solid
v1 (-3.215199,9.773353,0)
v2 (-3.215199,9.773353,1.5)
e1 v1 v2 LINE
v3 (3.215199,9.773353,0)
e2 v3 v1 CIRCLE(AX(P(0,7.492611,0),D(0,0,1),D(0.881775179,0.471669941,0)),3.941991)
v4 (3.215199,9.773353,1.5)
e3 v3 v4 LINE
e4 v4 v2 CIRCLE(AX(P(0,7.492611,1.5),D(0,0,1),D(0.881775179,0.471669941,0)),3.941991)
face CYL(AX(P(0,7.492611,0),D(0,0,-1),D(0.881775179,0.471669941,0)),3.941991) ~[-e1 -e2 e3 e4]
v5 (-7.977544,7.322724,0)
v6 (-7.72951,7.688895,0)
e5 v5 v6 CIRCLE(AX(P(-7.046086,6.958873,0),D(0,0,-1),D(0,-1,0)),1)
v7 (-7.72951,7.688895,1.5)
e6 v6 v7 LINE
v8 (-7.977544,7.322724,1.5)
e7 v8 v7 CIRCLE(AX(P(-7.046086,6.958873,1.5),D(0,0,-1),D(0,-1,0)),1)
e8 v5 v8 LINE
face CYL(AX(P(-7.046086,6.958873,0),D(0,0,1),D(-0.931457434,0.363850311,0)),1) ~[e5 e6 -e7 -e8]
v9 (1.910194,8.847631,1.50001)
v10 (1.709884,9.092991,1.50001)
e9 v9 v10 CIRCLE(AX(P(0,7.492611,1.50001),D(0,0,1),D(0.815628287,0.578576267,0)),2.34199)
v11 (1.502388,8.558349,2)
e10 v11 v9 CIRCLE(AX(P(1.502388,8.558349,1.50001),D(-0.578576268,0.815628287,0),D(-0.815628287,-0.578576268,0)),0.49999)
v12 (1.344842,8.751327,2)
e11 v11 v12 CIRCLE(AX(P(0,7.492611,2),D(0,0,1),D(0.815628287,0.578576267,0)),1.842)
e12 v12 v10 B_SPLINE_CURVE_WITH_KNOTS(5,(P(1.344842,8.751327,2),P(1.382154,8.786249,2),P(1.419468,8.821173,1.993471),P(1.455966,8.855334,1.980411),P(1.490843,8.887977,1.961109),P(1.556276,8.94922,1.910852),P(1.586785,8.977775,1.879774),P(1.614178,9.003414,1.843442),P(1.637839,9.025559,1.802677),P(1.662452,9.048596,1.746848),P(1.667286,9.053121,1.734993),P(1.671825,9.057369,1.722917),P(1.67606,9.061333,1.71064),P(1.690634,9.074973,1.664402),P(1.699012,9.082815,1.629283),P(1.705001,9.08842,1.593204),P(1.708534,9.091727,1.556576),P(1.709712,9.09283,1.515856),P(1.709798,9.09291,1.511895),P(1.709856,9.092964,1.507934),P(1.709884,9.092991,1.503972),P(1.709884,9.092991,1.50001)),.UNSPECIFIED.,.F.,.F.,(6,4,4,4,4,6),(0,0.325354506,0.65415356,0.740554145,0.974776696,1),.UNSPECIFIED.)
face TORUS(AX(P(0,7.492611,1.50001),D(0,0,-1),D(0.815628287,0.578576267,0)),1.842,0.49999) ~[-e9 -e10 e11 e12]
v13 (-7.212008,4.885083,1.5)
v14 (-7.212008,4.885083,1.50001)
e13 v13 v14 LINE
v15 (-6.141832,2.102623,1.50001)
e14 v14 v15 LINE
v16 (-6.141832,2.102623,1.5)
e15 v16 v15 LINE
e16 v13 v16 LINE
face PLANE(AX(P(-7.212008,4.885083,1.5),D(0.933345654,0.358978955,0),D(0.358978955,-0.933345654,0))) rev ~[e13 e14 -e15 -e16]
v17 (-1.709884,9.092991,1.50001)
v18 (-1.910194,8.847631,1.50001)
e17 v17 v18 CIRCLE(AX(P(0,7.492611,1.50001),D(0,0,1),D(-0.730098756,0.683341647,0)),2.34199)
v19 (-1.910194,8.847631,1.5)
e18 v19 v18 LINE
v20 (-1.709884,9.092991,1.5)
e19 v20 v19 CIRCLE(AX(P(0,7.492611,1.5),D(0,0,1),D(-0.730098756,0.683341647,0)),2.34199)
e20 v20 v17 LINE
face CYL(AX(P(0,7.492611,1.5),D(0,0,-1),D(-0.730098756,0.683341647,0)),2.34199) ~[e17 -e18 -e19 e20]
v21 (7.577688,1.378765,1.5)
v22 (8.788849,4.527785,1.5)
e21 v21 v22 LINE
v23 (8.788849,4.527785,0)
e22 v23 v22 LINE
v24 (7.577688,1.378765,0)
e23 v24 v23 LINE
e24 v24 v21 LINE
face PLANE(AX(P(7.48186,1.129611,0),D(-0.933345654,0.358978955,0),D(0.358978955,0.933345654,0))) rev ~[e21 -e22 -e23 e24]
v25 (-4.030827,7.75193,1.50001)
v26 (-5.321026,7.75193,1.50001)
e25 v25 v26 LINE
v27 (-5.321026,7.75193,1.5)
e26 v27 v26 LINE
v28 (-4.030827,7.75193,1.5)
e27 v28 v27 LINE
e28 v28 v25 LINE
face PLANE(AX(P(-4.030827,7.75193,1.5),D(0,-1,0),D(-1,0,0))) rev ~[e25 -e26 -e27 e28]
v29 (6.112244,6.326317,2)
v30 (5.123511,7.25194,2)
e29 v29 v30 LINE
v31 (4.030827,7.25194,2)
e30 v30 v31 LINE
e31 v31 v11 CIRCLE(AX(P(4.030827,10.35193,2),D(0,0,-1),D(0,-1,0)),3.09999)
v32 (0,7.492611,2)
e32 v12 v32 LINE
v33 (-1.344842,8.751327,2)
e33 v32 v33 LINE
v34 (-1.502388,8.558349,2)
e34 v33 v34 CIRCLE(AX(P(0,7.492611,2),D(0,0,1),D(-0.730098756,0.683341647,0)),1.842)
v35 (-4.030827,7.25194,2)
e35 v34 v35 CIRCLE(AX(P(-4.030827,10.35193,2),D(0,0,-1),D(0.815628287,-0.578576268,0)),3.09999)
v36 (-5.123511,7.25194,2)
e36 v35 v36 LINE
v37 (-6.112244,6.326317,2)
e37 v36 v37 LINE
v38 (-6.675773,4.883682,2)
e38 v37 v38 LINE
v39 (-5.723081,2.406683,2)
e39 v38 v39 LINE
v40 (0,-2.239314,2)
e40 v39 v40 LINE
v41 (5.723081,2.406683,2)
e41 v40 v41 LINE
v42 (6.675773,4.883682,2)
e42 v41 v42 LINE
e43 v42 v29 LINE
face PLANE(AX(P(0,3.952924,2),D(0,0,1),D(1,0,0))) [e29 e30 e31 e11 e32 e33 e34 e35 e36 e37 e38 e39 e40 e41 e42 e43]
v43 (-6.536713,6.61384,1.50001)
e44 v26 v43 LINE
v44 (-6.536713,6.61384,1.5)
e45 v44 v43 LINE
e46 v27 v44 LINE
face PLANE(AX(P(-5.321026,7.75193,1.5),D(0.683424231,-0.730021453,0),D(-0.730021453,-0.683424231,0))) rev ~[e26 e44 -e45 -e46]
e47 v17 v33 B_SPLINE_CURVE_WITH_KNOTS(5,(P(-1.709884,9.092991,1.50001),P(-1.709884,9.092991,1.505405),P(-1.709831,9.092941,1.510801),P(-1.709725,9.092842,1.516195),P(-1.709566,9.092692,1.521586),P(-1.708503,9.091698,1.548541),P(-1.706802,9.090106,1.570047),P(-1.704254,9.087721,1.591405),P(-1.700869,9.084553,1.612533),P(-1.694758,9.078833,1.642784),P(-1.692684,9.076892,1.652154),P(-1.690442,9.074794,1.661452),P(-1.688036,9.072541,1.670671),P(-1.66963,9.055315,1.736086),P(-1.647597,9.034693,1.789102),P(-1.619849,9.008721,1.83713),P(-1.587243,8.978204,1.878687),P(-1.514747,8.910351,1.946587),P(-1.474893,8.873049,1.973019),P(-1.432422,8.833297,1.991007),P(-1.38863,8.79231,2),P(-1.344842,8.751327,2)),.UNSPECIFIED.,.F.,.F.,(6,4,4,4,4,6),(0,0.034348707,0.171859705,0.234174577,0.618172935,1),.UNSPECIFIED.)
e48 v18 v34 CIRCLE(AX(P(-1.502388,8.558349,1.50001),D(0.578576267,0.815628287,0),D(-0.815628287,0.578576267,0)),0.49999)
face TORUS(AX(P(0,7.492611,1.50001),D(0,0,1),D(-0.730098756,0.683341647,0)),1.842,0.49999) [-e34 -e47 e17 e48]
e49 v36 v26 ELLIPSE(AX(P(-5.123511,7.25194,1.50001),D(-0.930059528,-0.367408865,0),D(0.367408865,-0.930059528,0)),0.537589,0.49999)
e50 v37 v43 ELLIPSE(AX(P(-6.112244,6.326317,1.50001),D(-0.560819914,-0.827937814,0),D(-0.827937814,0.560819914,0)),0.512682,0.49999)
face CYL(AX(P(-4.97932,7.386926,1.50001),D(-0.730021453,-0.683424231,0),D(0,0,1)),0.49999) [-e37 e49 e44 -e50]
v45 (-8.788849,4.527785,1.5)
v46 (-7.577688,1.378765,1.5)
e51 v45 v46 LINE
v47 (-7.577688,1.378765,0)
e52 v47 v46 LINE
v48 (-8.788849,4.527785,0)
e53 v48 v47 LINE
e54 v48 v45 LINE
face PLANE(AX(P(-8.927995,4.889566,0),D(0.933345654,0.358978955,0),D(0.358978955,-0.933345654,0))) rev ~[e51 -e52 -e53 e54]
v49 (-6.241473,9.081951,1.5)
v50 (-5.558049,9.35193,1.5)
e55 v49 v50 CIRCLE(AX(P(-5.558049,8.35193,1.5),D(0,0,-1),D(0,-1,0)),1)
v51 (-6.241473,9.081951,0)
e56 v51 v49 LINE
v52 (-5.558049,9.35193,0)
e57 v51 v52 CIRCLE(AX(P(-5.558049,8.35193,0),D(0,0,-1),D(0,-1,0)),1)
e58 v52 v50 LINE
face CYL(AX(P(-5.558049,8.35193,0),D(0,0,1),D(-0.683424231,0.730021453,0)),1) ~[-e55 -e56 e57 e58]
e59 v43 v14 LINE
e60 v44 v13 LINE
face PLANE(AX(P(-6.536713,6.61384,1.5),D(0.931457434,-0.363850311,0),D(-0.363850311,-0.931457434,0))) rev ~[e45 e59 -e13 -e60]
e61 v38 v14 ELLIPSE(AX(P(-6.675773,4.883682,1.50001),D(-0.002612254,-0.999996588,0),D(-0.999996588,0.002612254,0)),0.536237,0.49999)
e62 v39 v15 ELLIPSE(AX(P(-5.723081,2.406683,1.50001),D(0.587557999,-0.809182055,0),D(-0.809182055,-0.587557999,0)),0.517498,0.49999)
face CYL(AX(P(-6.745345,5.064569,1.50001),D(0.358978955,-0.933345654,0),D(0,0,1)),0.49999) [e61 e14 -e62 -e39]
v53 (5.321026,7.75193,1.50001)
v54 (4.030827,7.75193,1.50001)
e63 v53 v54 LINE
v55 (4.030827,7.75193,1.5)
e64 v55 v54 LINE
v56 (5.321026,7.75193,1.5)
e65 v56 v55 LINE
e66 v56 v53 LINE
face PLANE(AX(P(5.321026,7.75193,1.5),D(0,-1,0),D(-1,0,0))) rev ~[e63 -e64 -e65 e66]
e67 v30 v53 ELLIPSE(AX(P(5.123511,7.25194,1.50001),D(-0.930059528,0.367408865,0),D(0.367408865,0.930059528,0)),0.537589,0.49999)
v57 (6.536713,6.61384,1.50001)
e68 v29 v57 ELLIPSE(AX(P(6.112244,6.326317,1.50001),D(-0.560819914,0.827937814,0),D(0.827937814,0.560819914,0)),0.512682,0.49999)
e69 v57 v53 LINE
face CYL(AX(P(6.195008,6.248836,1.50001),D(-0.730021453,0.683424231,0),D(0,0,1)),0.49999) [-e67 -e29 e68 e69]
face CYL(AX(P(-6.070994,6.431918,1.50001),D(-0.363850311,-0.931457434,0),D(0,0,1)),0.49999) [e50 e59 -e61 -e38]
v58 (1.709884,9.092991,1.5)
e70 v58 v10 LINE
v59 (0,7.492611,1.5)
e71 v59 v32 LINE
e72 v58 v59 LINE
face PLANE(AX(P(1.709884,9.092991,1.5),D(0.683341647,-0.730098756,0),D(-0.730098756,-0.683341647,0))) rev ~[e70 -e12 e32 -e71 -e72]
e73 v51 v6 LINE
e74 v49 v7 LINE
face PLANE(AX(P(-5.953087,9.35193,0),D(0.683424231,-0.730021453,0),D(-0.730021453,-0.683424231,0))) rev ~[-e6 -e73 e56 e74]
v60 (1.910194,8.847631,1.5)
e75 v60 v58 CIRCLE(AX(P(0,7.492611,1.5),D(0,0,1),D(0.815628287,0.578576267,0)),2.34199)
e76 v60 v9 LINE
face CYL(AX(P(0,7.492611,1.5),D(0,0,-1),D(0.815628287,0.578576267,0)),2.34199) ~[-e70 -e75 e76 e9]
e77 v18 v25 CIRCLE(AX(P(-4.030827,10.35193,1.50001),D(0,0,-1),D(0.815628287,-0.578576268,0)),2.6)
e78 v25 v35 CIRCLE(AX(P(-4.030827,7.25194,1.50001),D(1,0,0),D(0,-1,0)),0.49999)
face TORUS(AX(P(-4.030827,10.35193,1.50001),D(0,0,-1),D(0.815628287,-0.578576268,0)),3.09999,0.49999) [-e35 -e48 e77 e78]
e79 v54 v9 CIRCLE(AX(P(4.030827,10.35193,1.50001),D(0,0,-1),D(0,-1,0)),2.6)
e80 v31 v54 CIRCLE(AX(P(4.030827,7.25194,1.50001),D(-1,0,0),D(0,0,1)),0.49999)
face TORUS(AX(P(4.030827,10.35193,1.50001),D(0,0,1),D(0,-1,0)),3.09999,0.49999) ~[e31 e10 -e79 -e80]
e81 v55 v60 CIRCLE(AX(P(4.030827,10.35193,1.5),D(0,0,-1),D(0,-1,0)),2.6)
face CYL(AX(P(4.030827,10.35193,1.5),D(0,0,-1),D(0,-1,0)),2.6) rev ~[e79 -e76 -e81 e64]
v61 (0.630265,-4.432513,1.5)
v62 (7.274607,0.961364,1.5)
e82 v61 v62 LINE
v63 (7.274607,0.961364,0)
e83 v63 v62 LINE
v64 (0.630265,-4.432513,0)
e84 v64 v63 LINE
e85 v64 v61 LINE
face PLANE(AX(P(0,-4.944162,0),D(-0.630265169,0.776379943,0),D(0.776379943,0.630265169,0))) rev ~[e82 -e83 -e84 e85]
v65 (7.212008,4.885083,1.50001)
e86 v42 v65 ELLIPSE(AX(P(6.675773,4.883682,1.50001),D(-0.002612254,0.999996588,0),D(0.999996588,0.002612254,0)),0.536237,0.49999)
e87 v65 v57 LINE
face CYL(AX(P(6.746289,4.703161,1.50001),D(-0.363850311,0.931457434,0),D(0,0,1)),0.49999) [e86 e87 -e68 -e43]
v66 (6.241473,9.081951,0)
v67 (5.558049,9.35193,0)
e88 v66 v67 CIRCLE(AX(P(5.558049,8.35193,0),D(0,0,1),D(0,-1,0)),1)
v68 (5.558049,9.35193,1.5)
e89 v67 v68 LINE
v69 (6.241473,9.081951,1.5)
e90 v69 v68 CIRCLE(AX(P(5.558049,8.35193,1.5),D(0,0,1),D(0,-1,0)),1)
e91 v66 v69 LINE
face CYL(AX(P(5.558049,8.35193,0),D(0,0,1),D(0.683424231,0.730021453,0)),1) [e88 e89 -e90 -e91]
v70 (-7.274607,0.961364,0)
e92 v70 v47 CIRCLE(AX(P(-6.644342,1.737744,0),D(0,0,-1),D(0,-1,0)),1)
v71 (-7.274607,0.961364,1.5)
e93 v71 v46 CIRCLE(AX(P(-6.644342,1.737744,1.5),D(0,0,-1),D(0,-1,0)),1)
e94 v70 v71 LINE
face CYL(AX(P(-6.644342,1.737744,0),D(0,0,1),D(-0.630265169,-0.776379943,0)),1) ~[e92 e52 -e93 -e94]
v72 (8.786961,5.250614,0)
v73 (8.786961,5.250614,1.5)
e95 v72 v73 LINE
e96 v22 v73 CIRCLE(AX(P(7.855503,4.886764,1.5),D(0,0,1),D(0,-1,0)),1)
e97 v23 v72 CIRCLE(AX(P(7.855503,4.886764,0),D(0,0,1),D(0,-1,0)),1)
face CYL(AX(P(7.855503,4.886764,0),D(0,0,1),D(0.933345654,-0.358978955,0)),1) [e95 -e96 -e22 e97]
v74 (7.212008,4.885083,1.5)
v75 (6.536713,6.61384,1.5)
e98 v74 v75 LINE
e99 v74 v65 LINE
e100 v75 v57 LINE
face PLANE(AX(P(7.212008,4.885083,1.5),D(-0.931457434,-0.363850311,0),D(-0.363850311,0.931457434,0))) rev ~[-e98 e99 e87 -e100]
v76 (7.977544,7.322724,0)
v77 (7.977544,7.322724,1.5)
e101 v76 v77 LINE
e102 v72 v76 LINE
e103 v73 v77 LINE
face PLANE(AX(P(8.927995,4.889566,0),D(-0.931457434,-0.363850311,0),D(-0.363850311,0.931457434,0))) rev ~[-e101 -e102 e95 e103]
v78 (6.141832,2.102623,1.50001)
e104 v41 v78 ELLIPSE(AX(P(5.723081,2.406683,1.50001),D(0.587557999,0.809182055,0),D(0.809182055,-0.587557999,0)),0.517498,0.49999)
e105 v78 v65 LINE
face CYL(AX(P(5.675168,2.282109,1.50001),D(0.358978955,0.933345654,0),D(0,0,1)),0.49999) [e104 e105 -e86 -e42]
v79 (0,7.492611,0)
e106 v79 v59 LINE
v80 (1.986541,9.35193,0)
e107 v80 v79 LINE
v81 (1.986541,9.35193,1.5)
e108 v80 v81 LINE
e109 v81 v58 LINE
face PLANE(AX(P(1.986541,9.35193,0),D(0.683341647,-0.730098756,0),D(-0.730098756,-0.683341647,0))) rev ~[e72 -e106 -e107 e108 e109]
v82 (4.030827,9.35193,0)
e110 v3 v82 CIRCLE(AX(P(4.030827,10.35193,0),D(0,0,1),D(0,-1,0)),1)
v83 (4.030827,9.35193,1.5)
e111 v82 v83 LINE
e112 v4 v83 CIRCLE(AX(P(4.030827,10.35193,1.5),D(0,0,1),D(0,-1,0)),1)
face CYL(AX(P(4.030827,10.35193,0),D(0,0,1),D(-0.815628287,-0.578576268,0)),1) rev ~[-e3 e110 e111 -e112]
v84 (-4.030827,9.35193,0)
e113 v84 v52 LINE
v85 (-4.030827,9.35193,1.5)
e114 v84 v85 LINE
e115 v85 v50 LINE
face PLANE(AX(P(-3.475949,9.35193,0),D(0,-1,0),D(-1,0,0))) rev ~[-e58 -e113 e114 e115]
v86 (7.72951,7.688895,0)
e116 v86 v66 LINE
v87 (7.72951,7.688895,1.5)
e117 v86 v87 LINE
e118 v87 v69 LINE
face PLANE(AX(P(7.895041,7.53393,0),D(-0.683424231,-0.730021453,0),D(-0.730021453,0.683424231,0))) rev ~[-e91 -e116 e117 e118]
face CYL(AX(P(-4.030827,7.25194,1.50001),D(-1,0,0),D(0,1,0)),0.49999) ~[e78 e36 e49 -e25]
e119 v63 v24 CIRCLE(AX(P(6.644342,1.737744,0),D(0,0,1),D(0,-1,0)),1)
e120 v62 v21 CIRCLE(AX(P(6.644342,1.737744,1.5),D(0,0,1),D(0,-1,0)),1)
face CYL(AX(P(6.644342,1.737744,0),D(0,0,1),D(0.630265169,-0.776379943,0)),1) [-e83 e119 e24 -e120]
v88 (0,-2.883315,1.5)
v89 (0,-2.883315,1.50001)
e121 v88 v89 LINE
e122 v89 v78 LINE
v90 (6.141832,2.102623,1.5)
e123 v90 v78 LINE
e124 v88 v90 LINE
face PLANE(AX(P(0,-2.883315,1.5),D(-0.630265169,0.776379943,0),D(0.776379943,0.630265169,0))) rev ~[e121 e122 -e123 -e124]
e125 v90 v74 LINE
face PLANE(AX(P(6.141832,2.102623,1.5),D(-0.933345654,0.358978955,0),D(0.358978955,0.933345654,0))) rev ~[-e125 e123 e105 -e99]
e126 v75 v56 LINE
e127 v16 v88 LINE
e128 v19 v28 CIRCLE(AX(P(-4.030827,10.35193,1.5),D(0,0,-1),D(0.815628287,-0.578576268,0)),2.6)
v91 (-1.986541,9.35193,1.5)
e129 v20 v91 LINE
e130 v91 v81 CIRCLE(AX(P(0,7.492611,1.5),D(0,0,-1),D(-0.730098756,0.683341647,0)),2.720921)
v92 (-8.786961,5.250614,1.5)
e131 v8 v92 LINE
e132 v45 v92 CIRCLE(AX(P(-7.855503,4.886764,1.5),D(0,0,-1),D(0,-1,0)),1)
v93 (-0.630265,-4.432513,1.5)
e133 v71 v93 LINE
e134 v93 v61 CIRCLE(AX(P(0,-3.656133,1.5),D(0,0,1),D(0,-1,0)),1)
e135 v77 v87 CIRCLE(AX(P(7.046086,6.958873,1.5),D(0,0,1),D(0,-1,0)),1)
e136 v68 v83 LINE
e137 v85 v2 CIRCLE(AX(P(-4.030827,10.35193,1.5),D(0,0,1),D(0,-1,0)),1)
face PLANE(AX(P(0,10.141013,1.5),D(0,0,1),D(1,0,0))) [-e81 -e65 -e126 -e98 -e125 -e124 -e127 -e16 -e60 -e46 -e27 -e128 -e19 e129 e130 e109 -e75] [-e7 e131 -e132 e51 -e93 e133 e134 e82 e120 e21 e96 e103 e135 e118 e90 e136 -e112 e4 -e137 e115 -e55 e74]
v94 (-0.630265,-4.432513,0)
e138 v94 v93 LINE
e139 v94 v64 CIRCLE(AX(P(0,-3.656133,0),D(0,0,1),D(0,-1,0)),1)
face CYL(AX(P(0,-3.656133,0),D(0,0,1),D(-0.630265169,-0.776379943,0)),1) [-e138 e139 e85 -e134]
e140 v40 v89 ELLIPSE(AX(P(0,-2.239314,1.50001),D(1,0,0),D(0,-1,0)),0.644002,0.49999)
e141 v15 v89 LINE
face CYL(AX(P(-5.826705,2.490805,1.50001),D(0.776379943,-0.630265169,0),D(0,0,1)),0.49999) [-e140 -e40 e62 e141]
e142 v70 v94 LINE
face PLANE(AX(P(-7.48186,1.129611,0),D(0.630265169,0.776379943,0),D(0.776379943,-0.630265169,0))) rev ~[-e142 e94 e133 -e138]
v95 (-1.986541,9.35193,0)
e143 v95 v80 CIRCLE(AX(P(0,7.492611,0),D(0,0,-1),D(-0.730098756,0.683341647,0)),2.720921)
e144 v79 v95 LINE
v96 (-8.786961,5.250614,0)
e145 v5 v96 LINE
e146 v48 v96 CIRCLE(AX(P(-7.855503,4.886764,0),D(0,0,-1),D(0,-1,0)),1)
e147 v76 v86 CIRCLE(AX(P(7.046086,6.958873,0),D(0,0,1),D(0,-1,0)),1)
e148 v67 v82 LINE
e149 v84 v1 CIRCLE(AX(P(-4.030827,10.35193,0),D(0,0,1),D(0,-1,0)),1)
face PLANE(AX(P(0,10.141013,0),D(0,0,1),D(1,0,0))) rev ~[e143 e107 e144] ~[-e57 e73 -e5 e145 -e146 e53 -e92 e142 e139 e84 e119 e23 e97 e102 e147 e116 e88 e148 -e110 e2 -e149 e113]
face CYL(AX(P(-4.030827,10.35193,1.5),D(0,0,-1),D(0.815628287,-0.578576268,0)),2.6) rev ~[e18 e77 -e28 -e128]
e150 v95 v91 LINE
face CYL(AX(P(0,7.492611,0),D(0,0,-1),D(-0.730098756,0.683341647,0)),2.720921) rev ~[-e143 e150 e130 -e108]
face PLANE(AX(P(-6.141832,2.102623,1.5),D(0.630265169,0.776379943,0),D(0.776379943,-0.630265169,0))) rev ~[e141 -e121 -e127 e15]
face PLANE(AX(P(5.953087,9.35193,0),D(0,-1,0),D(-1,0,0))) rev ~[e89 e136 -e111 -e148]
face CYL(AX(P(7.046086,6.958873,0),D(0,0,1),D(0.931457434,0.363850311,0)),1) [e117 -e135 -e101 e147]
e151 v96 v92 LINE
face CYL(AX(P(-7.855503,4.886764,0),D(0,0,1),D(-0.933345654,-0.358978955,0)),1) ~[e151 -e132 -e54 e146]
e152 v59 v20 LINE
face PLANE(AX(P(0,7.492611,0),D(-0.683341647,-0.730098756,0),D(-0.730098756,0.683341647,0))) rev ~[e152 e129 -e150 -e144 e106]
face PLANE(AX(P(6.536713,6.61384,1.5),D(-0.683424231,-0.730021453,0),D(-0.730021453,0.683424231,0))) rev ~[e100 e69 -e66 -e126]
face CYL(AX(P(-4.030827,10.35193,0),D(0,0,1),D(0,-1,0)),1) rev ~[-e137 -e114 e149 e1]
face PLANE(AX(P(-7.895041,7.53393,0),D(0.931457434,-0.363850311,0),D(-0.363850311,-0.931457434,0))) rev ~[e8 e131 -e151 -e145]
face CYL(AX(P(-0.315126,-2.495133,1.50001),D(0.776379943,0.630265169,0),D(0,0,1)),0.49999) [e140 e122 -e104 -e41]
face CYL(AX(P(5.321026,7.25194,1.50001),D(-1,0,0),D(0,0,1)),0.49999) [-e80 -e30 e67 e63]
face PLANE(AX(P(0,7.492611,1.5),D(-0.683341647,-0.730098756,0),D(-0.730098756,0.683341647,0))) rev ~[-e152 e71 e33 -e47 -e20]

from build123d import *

# Parameters (mm, degrees)
F1_DEPTH = 1.5
F2_R     = 1
F3_R     = 1
F5_DEPTH = 0.5
F6_R     = 0.49999


# Not quite as in the source:
# - a fillet or chamfer is up to 0.001 mm smaller than in the source, because OpenCascade refuses the exact size


with BuildPart() as f1:
    # F0 (on Top) → F1 (new body)
    with BuildSketch(Plane.XY):
        with BuildLine():
            ThreePointArc((-1.986540854, 9.3519296497), (0, 10.2135319331), (1.986540854, 9.3519296497))
            Line((1.986540854, 9.3519296497), (3.4759494504, 9.3519296497))
            ThreePointArc((3.4759494504, 9.3519296497), (0, 11.4346017651), (-3.4759494504, 9.3519296497))
            Line((-3.4759494504, 9.3519296497), (-1.986540854, 9.3519296497))
        make_face()
        with BuildLine():
            Line((5.9530865401, 9.3519296497), (3.4759494504, 9.3519296497))
            ThreePointArc((3.4759494504, 9.3519296497), (3.8237056455, 8.4510290854), (3.9419905804, 7.4926111847))
            ThreePointArc((3.9419905804, 7.4926111847), (-0.9584179006, 3.6689055392), (-3.4759494504, 9.3519296497))
            Line((-3.4759494504, 9.3519296497), (-5.9530865401, 9.3519296497))
            Line((-5.9530865401, 9.3519296497), (-7.8950412571, 7.5339297764))
            Line((-7.8950412571, 7.5339297764), (-8.927995339, 4.88956552))
            Line((-8.927995339, 4.88956552), (-7.4818595313, 1.1296109296))
            Line((-7.4818595313, 1.1296109296), (0, -4.9441619776))
            Line((0, -4.9441619776), (7.4818595313, 1.1296109296))
            Line((7.4818595313, 1.1296109296), (8.927995339, 4.88956552))
            Line((8.927995339, 4.88956552), (7.8950412571, 7.5339297764))
            Line((7.8950412571, 7.5339297764), (5.9530865401, 9.3519296497))
        make_face()
        with BuildLine():
            Line((3.4759494504, 9.3519296497), (1.986540854, 9.3519296497))
            ThreePointArc((1.986540854, 9.3519296497), (2.5306748058, 8.4921584552), (2.7209207483, 7.4926111847))
            ThreePointArc((2.7209207483, 7.4926111847), (-0.9995472705, 4.9619363789), (-1.986540854, 9.3519296497))
            Line((-1.986540854, 9.3519296497), (-3.4759494504, 9.3519296497))
            ThreePointArc((-3.4759494504, 9.3519296497), (-0.9584179006, 3.6689055392), (3.9419905804, 7.4926111847))
            ThreePointArc((3.9419905804, 7.4926111847), (3.8237056455, 8.4510290854), (3.4759494504, 9.3519296497))
        make_face()
        with BuildLine():
            Line((1.986540854, 9.3519296497), (0, 7.4926111847))
            Line((0, 7.4926111847), (-1.986540854, 9.3519296497))
            ThreePointArc((-1.986540854, 9.3519296497), (-0.9995472705, 4.9619363789), (2.7209207483, 7.4926111847))
            ThreePointArc((2.7209207483, 7.4926111847), (2.5306748058, 8.4921584552), (1.986540854, 9.3519296497))
        make_face()
    extrude(amount=F1_DEPTH)

    # F2
    f2_edges = [f1.edges().sort_by_distance(p)[0] for p in [
        (0, -4.944162, 0.75),
    ]]
    fillet(f2_edges, radius=F2_R)

    # F3
    f3_edges = [f1.edges().sort_by_distance(p)[0] for p in [
        (7.48186, 1.129611, 0.75),
        (8.927995, 4.889566, 0.75),
        (7.895041, 7.53393, 0.75),
        (5.953087, 9.35193, 0.75),
        (-7.48186, 1.129611, 0.75),
        (-8.927995, 4.889566, 0.75),
        (-7.895041, 7.53393, 0.75),
        (-5.953087, 9.35193, 0.75),
        (-3.475949, 9.35193, 0.75),
        (3.475949, 9.35193, 0.75),
    ]]
    fillet(f3_edges, radius=F3_R)

    # F4 (on face) → F5 (join)
    with BuildSketch(Plane.XY.offset(1.5)):
        with BuildLine():
            ThreePointArc((-1.7098843542, 9.0929908328), (-1.8141917234, 8.9737012946), (-1.9101937031, 8.8476313097))
            ThreePointArc((-1.9101937031, 8.8476313097), (-2.837339859, 8.0420404539), (-4.0308273111, 7.7519295737))
            Line((-4.0308273111, 7.7519295737), (-5.3210256953, 7.7519295737))
            Line((-5.3210256953, 7.7519295737), (-6.5367130105, 6.613839501))
            Line((-6.5367130105, 6.613839501), (-7.2120080925, 4.88508291))
            Line((-7.2120080925, 4.88508291), (-6.141831705, 2.1026231998))
            Line((-6.141831705, 2.1026231998), (0, -2.8833152363))
            Line((0, -2.8833152363), (6.141831705, 2.1026231998))
            Line((6.141831705, 2.1026231998), (7.2120080925, 4.88508291))
            Line((7.2120080925, 4.88508291), (6.5367130105, 6.613839501))
            Line((6.5367130105, 6.613839501), (5.3210256953, 7.7519295737))
            Line((5.3210256953, 7.7519295737), (4.0308273111, 7.7519295737))
            ThreePointArc((4.0308273111, 7.7519295737), (2.837339859, 8.0420404539), (1.9101937031, 8.8476313097))
            ThreePointArc((1.9101937031, 8.8476313097), (1.8141917234, 8.9737012946), (1.7098843542, 9.0929908328))
            Line((1.7098843542, 9.0929908328), (0, 7.4926111847))
            Line((0, 7.4926111847), (-1.7098843542, 9.0929908328))
        make_face()
    extrude(amount=F5_DEPTH)

    # F6 (radius 0.5 in the source; OpenCascade refuses exactly that, so slightly less here)
    f6_edges = [f1.edges().sort_by_distance(p)[0] for p in [
        (-5.928869, 7.182885, 2),
        (-6.874361, 5.749461, 2),
        (-6.67692, 3.493853, 2),
        (-3.070916, -0.390346, 2),
        (3.070916, -0.390346, 2),
        (6.67692, 3.493853, 2),
        (6.874361, 5.749461, 2),
        (5.928869, 7.182885, 2),
        (4.675927, 7.75193, 2),
        (2.83734, 8.04204, 2),
        (-2.83734, 8.04204, 2),
    ]]
    fillet(f6_edges, radius=F6_R)


solid = f1.part
